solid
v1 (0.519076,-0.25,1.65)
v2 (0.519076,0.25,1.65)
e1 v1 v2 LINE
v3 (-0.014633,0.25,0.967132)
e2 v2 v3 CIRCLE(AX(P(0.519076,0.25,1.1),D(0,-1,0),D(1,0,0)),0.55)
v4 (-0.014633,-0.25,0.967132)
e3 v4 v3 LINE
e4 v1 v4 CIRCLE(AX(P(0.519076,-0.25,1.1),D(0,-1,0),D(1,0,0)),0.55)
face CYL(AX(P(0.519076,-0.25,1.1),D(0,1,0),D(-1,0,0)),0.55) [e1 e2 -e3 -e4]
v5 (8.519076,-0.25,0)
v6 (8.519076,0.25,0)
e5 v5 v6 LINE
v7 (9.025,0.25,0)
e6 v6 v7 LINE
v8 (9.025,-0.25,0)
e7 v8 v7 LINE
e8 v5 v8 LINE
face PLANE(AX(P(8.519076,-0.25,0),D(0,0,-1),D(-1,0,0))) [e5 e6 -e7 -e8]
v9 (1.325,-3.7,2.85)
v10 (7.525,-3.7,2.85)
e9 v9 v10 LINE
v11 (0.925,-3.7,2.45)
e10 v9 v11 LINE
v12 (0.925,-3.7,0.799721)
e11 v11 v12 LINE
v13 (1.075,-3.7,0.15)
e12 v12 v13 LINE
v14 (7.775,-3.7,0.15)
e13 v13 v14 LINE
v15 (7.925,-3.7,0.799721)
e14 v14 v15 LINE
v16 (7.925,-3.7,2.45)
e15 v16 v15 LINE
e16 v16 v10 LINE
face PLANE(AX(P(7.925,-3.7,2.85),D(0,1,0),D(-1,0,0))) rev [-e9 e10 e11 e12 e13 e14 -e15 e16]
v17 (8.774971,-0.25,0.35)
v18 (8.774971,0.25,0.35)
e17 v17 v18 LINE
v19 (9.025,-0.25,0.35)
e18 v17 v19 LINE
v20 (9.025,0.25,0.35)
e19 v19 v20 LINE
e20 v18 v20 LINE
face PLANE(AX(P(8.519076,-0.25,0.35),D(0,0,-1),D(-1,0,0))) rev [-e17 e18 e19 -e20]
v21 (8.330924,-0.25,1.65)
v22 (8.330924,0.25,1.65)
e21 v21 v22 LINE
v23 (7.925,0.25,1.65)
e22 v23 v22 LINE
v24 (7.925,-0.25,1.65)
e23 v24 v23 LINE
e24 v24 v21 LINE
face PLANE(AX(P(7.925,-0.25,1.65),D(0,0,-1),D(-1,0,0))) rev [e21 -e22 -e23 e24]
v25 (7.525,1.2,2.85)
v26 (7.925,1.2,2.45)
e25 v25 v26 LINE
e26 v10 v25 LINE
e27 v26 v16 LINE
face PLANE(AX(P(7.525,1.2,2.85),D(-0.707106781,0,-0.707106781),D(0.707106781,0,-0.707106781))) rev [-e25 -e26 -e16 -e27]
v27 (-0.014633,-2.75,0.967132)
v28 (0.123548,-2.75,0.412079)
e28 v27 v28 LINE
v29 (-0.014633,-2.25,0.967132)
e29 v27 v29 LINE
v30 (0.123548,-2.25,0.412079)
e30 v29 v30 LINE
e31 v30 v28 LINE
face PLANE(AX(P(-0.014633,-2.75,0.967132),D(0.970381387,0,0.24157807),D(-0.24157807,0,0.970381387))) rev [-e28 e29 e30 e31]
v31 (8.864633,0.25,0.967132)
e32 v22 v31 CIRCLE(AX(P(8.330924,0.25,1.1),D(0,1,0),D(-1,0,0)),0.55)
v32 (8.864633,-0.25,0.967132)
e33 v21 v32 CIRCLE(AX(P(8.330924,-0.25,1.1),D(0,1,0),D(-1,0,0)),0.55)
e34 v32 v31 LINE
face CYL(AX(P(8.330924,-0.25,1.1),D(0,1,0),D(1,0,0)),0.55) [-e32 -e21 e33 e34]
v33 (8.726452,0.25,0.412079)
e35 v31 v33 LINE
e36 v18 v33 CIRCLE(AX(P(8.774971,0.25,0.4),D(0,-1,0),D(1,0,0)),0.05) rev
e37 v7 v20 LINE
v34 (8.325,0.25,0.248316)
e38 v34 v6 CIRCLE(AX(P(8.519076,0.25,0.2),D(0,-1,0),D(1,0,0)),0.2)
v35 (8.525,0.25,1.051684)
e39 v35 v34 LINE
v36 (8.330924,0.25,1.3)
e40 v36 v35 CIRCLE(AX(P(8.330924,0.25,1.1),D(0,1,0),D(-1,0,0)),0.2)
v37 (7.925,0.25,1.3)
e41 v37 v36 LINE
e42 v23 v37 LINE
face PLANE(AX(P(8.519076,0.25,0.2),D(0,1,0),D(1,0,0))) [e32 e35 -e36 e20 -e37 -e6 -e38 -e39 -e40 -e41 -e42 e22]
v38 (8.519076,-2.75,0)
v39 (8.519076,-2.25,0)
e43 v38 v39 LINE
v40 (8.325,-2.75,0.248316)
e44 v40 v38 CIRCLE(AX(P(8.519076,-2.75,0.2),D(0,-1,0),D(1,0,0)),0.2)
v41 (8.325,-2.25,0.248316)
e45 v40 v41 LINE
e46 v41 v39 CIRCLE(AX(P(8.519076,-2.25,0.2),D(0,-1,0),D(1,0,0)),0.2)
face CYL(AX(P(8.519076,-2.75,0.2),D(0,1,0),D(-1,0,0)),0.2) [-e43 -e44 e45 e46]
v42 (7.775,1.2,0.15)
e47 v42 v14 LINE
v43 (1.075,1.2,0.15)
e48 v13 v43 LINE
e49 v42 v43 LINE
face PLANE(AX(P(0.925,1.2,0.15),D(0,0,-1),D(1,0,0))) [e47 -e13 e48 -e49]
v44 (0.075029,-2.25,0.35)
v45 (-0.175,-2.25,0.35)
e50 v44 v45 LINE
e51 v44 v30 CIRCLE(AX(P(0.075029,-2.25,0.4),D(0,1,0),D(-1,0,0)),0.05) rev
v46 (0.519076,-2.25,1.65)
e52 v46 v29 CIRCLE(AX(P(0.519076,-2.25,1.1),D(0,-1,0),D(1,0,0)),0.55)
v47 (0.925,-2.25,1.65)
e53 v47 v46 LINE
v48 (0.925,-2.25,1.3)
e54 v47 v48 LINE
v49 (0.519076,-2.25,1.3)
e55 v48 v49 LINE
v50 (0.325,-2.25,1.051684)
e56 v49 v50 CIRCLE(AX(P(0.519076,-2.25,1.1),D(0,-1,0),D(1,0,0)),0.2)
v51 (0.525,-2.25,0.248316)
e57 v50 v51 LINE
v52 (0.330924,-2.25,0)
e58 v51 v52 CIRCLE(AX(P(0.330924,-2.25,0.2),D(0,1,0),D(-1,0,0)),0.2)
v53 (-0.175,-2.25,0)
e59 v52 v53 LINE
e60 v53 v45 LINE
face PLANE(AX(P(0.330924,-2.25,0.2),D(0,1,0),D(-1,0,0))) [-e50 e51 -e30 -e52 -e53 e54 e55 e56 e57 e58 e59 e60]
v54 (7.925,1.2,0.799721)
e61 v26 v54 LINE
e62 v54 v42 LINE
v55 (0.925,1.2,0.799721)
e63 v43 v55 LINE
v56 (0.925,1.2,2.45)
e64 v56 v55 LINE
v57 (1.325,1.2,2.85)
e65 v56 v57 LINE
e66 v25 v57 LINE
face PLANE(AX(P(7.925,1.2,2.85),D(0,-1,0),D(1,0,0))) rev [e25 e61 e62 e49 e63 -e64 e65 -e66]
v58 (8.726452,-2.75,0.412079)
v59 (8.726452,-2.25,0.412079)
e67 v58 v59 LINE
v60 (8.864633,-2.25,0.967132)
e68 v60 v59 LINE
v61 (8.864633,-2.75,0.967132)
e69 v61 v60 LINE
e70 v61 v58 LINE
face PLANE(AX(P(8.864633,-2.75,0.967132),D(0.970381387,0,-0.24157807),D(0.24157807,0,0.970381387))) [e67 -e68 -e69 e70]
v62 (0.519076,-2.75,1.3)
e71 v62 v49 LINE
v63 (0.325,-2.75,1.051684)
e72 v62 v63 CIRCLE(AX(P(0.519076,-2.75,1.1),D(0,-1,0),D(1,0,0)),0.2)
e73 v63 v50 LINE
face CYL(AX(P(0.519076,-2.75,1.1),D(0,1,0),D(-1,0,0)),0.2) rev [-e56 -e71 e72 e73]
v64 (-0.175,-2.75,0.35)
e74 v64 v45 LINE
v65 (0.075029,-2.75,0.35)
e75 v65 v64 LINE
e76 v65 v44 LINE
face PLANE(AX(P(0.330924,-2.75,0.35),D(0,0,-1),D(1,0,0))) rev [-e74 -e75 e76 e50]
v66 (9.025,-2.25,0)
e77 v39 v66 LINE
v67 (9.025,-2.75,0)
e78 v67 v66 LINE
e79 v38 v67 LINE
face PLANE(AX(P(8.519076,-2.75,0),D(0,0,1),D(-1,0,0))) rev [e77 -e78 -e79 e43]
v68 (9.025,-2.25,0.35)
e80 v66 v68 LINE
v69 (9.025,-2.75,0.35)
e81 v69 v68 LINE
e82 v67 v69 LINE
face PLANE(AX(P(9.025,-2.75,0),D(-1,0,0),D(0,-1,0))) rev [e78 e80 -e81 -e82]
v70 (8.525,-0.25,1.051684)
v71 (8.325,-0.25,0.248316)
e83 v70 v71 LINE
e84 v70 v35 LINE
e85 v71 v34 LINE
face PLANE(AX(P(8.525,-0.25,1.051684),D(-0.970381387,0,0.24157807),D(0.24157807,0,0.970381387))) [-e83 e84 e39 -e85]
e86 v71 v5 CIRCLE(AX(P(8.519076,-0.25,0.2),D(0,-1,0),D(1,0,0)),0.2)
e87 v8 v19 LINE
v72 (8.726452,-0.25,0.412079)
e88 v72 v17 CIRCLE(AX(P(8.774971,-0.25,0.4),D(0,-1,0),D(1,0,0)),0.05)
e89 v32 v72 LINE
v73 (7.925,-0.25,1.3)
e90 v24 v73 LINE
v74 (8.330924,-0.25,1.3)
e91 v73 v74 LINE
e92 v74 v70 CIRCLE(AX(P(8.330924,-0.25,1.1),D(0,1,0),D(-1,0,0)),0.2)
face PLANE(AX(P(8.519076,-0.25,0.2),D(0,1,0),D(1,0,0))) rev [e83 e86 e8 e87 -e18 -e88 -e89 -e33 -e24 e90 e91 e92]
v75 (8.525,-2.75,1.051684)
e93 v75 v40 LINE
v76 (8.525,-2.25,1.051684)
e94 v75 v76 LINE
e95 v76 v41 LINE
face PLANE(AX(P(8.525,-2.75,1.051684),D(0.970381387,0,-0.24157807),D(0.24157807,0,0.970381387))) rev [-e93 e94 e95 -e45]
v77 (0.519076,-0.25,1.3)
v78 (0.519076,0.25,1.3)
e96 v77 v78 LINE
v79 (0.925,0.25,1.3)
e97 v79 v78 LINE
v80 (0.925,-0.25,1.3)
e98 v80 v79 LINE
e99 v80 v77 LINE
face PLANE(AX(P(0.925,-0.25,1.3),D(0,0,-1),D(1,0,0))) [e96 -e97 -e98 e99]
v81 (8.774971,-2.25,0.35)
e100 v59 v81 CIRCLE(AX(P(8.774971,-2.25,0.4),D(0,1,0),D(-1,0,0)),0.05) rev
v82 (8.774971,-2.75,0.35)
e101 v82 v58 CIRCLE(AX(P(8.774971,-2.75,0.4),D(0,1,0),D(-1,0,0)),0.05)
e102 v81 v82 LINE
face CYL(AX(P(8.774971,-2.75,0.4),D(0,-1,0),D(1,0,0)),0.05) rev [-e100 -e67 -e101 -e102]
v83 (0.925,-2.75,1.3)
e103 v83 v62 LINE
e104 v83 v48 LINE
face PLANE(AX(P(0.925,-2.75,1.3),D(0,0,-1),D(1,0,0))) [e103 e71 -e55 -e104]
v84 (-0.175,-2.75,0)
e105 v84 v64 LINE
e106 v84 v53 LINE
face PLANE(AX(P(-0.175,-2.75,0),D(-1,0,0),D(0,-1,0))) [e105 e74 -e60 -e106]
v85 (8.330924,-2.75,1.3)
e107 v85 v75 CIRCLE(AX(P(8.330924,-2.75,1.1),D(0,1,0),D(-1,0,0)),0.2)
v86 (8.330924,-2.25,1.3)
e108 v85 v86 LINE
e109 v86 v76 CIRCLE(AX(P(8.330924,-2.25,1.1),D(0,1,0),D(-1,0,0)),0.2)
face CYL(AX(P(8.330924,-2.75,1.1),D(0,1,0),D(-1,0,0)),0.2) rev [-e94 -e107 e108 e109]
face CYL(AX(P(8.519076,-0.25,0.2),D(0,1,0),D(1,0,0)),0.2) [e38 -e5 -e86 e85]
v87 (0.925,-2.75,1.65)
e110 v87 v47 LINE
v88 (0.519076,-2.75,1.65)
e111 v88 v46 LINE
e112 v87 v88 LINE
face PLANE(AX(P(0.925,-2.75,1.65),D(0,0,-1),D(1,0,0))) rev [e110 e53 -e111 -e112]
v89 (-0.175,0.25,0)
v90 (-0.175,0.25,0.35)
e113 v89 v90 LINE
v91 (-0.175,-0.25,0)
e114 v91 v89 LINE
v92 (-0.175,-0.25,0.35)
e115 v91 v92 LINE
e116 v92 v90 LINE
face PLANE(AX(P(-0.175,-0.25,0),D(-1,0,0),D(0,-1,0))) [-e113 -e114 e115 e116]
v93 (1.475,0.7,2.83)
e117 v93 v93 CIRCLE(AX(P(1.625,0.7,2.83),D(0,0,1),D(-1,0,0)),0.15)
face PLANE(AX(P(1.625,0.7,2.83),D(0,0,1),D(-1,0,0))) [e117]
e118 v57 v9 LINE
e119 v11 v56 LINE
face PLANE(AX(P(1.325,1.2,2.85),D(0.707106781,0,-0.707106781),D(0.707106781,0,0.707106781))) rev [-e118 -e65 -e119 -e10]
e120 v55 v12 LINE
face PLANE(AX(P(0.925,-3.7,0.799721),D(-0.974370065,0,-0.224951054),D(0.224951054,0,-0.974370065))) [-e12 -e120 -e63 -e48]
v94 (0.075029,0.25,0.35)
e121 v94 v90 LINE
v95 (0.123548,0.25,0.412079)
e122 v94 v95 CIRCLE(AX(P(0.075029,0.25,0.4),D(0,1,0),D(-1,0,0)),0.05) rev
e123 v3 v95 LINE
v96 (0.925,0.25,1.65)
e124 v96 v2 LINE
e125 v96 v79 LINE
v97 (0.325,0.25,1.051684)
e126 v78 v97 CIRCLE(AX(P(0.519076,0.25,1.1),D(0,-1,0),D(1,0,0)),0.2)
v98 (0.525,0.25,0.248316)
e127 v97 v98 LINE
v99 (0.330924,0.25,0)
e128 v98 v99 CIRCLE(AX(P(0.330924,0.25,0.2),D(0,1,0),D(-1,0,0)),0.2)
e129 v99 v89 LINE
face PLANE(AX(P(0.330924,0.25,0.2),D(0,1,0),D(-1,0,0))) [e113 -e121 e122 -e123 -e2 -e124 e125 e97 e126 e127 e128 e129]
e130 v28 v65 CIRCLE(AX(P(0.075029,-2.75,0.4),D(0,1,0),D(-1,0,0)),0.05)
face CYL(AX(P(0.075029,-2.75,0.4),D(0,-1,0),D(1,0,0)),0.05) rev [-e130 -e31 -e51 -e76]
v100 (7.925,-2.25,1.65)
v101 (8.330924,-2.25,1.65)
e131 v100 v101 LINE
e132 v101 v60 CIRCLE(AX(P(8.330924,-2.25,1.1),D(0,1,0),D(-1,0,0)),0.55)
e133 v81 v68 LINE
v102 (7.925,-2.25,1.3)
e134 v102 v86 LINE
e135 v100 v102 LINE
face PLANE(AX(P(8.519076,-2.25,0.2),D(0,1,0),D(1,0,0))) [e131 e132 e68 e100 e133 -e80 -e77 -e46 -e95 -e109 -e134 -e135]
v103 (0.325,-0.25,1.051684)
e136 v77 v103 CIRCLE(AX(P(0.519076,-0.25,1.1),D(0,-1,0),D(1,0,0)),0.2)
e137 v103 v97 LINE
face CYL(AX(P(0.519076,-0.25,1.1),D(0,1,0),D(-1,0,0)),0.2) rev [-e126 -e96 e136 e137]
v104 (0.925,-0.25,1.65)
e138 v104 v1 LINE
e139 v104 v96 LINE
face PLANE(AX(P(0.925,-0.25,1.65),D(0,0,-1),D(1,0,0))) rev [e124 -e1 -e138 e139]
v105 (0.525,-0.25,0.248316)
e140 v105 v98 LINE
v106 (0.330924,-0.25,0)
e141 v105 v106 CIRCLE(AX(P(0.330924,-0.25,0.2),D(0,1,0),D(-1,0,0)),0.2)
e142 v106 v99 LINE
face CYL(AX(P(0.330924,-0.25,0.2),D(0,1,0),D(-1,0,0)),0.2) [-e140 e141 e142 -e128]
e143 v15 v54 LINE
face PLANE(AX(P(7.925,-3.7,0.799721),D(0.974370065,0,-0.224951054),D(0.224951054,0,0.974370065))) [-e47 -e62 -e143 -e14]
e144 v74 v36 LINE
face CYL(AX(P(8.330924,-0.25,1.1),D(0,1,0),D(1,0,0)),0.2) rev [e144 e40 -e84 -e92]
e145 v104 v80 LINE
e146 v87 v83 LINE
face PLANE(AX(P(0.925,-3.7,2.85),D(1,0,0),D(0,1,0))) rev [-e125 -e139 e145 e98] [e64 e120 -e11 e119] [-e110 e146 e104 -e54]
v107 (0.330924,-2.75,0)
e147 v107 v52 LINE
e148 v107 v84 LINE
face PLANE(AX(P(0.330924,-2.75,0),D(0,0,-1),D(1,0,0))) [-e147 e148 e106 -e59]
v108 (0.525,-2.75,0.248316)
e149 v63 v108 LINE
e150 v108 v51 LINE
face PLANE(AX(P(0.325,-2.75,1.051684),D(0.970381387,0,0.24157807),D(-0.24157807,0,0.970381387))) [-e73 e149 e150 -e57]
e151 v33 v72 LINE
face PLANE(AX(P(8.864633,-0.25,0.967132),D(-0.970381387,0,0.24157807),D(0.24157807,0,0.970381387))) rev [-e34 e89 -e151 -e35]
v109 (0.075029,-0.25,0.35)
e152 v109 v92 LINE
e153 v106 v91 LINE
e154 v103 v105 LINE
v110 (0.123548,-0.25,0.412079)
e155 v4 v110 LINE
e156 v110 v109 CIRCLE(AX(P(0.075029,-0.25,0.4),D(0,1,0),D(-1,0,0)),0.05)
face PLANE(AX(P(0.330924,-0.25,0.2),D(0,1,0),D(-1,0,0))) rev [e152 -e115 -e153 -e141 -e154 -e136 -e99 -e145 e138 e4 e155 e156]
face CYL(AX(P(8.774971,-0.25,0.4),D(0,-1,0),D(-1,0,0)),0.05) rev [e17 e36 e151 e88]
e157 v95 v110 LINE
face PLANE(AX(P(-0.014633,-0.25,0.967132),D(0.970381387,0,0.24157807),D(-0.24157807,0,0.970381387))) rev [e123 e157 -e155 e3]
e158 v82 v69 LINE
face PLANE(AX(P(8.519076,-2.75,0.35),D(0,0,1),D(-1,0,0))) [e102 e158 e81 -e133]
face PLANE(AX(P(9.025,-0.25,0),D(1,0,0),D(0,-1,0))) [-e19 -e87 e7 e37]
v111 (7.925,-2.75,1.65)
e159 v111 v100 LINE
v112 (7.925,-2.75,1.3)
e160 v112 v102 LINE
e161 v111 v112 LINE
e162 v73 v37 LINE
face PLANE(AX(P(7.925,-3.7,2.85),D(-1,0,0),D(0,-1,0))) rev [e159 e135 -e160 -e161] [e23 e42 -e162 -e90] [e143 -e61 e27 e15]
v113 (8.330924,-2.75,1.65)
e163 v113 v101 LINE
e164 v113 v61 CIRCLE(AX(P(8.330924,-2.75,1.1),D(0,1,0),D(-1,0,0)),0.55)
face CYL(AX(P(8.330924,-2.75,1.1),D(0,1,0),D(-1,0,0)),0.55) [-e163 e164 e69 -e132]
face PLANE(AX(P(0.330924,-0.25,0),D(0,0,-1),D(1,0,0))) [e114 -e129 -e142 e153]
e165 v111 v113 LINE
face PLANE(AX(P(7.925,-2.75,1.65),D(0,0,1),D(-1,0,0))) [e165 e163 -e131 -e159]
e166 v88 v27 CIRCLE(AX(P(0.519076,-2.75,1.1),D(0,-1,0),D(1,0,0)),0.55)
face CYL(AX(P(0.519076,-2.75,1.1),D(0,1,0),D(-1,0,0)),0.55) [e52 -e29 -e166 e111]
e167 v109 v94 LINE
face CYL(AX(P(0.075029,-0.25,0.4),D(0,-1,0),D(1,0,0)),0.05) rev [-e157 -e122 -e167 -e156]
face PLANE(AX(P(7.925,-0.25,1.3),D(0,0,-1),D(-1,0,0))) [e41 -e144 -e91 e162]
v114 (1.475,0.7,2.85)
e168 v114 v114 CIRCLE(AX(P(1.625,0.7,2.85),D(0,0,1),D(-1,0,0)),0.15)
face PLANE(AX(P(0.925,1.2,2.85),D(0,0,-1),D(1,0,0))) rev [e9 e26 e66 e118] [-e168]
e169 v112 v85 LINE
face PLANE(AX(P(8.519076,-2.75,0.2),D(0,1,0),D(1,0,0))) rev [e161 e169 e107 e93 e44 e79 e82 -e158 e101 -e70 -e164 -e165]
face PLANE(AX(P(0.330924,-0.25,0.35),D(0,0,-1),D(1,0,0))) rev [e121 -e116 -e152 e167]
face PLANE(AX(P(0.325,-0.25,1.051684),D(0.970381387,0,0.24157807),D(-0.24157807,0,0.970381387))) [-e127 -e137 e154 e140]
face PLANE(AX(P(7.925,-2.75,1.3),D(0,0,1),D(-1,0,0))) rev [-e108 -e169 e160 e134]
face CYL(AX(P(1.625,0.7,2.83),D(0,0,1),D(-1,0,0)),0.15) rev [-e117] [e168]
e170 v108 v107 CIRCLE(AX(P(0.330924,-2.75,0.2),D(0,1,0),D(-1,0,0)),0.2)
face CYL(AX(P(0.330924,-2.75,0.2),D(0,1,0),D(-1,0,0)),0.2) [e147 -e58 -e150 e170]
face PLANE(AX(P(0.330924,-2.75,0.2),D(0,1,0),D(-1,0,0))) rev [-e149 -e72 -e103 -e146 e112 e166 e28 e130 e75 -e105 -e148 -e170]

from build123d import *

# Parameters (mm, degrees)
SKETCH_2_W                     = 4.9
SKETCH_2_H                     = 7
EXTRUDE_1_DEPTH                = 2.7
EXTRUDE_2_DEPTH                = 0.25
FILLET_1_R                     = 0.05
CHAMFER_1_SIZE                 = 0.4
PATTERN_LINEAR_2_COUNT         = 2
PATTERN_LINEAR_2_PITCH         = 2.5
FILLET_1_OF_PATTERN_LINEAR_2_R = 0.05
MIRROR_START                   = -1.5
MIRROR_1_DEPTH                 = 0.5
MIRROR_START_2                 = 1
MIRROR_1_2_DEPTH               = 0.5
CHAMFER_2_SIZE                 = 0.4
CHAMFER_3_SIZE                 = 0.15
CHAMFER_3_SIZE2                = 0.649721381
CHAMFER_4_SIZE                 = 0.15
CHAMFER_4_SIZE2                = 0.649721381
SKETCH_7_R                     = 0.15
CUT_EXTRUDE_2_DEPTH            = 0.02
MOVE_BODY_2_ANGLE              = 120


with BuildPart() as part:
    # Эскиз2 → Бобышка-Вытянуть1 (new body)
    with BuildSketch(Plane(origin=(0, 0.15, 0), x_dir=(-1, 0, 0), z_dir=(0, 1, 0))):
        Rectangle(SKETCH_2_W, SKETCH_2_H)
    extrude(amount=EXTRUDE_1_DEPTH)

    # Эскиз4 → Вытянуть-Тонкостенный2 (add, symmetric)
    with BuildSketch(Plane(origin=(1.25, 0, 0), x_dir=(0, 0, -1), z_dir=(1, 0, 0))):
        with BuildLine():
            Line((-3.5, 1.3), (-3.905923723, 1.3))
            ThreePointArc((-3.905923723, 1.3), (-4.063504056, 1.223160215), (-4.1, 1.051684386))
            Line((-4.1, 1.051684386), (-3.9, 0.248315614))
            ThreePointArc((-3.9, 0.248315614), (-3.936495944, 0.076839785), (-4.094076277, 0))
            Line((-4.094076277, 0), (-4.6, 0))
            Line((-4.6, 0), (-4.6, 0.35))
            Line((-4.6, 0.35), (-4.285997426, 0.35))
            Line((-4.285997426, 0.35), (-4.439633485, 0.967132062))
            ThreePointArc((-4.439633485, 0.967132062), (-4.339269639, 1.438690592), (-3.905923723, 1.65))
            Line((-3.905923723, 1.65), (-3.5, 1.65))
            Line((-3.5, 1.65), (-3.5, 1.3))
        make_face()
    extrude_2 = extrude(amount=EXTRUDE_2_DEPTH, both=True)

    # Скругление1
    fillet_1_edges = [part.edges().sort_by_distance(p)[0] for p in [
        (1.25, 0.35, 4.285997426),
    ]]
    fillet(fillet_1_edges, radius=FILLET_1_R)

    # Фаска1
    chamfer_1_edges = [part.edges().sort_by_distance(p)[0] for p in [
        (0, 2.85, 3.5),
    ]]
    chamfer(chamfer_1_edges, length=CHAMFER_1_SIZE)

    # Линейный массив2: Вытянуть-Тонкостенный2 ×2
    with Locations(*[(-i * PATTERN_LINEAR_2_PITCH, 0, 0) for i in range(1, PATTERN_LINEAR_2_COUNT)]):
        add(extrude_2)

    # Скругление1 of Линейный массив2
    fillet_1_of_pattern_linear_2_edges = [part.edges().sort_by_distance(p)[0] for p in [
        (-1.25, 0.35, 4.285997426),
    ]]
    fillet(fillet_1_of_pattern_linear_2_edges, radius=FILLET_1_OF_PATTERN_LINEAR_2_R)

    # Зеркальное отражение1: read off the stored shape, not the designer's step
    # Зеркальное отражение1 outline → Зеркальное отражение1 (add)
    with BuildSketch(Plane.YZ.offset(MIRROR_START)):
        with BuildLine():
            Line((0, -4.6), (0.35, -4.6))
            Line((0.35, -4.6), (0.35, -4.349971142))
            ThreePointArc((0.35, -4.349971142), (0.369209946, -4.310576059), (0.412078903, -4.301452073))
            Line((0.412078903, -4.301452073), (0.967132062, -4.439633485))
            ThreePointArc((0.967132062, -4.439633485), (1.438690592, -4.339269639), (1.65, -3.905923723))
            Line((1.65, -3.905923723), (1.65, -3.5))
            Line((1.65, -3.5), (1.3, -3.5))
            Line((1.3, -3.5), (1.3, -3.905923723))
            ThreePointArc((1.3, -3.905923723), (1.223160215, -4.063504056), (1.051684386, -4.1))
            Line((1.051684386, -4.1), (0.248315614, -3.9))
            ThreePointArc((0.248315614, -3.9), (0.076839785, -3.936495944), (0, -4.094076277))
            Line((0, -4.094076277), (0, -4.6))
        make_face()
    extrude(amount=MIRROR_1_DEPTH)

    # Mirror 1 2 outline → Mirror 1 2 (add)
    with BuildSketch(Plane.YZ.offset(MIRROR_START_2)):
        with BuildLine():
            Line((0, -4.6), (0.35, -4.6))
            Line((0.35, -4.6), (0.35, -4.349971142))
            ThreePointArc((0.35, -4.349971142), (0.369209946, -4.310576059), (0.412078903, -4.301452073))
            Line((0.412078903, -4.301452073), (0.967132062, -4.439633485))
            ThreePointArc((0.967132062, -4.439633485), (1.438690592, -4.339269639), (1.65, -3.905923723))
            Line((1.65, -3.905923723), (1.65, -3.5))
            Line((1.65, -3.5), (1.3, -3.5))
            Line((1.3, -3.5), (1.3, -3.905923723))
            ThreePointArc((1.3, -3.905923723), (1.223160215, -4.063504056), (1.051684386, -4.1))
            Line((1.051684386, -4.1), (0.248315614, -3.9))
            ThreePointArc((0.248315614, -3.9), (0.076839785, -3.936495944), (0, -4.094076277))
            Line((0, -4.094076277), (0, -4.6))
        make_face()
    extrude(amount=MIRROR_1_2_DEPTH)

    # Фаска2
    chamfer_2_edges = [part.edges().sort_by_distance(p)[0] for p in [
        (0, 2.85, -3.5),
    ]]
    chamfer(chamfer_2_edges, length=CHAMFER_2_SIZE)

    # Фаска3
    chamfer_3_edges = [part.edges().sort_by_distance(p)[0] for p in [
        (0, 0.15, -3.5),
    ]]
    chamfer_3_side = [part.faces().sort_by_distance(p)[0] for p in [
        (0, 0.15, 0),
    ]]
    chamfer(chamfer_3_edges, length=CHAMFER_3_SIZE, length2=CHAMFER_3_SIZE2, reference=chamfer_3_side[0])

    # Фаска4
    chamfer_4_edges = [part.edges().sort_by_distance(p)[0] for p in [
        (0, 0.15, 3.5),
    ]]
    chamfer_4_side = [part.faces().sort_by_distance(p)[0] for p in [
        (0, 0.15, 0.075),
    ]]
    chamfer(chamfer_4_edges, length=CHAMFER_4_SIZE, length2=CHAMFER_4_SIZE2, reference=chamfer_4_side[0])

    # Эскиз7 → Вырез-Вытянуть2 (cut)
    with BuildSketch(Plane(origin=(0, 2.85, 0), x_dir=(1, 0, 0), z_dir=(0, 1, 0))):
        with Locations(Location((-1.95, -2.8, 0), (0, 0, 270))):
            Circle(SKETCH_7_R)
    extrude(amount=-CUT_EXTRUDE_2_DEPTH, mode=Mode.SUBTRACT)


with BuildPart() as part_1:
    # Move Body 2: read off the stored shape, not the designer's step
    # Move Body 2: moved
    add(part.part.moved(Location((1.25, 0, -4.425))).rotate(Axis((0, 0, 0), (0.5773502692, -0.5773502692, -0.5773502692)), MOVE_BODY_2_ANGLE))


solid = part_1.part
